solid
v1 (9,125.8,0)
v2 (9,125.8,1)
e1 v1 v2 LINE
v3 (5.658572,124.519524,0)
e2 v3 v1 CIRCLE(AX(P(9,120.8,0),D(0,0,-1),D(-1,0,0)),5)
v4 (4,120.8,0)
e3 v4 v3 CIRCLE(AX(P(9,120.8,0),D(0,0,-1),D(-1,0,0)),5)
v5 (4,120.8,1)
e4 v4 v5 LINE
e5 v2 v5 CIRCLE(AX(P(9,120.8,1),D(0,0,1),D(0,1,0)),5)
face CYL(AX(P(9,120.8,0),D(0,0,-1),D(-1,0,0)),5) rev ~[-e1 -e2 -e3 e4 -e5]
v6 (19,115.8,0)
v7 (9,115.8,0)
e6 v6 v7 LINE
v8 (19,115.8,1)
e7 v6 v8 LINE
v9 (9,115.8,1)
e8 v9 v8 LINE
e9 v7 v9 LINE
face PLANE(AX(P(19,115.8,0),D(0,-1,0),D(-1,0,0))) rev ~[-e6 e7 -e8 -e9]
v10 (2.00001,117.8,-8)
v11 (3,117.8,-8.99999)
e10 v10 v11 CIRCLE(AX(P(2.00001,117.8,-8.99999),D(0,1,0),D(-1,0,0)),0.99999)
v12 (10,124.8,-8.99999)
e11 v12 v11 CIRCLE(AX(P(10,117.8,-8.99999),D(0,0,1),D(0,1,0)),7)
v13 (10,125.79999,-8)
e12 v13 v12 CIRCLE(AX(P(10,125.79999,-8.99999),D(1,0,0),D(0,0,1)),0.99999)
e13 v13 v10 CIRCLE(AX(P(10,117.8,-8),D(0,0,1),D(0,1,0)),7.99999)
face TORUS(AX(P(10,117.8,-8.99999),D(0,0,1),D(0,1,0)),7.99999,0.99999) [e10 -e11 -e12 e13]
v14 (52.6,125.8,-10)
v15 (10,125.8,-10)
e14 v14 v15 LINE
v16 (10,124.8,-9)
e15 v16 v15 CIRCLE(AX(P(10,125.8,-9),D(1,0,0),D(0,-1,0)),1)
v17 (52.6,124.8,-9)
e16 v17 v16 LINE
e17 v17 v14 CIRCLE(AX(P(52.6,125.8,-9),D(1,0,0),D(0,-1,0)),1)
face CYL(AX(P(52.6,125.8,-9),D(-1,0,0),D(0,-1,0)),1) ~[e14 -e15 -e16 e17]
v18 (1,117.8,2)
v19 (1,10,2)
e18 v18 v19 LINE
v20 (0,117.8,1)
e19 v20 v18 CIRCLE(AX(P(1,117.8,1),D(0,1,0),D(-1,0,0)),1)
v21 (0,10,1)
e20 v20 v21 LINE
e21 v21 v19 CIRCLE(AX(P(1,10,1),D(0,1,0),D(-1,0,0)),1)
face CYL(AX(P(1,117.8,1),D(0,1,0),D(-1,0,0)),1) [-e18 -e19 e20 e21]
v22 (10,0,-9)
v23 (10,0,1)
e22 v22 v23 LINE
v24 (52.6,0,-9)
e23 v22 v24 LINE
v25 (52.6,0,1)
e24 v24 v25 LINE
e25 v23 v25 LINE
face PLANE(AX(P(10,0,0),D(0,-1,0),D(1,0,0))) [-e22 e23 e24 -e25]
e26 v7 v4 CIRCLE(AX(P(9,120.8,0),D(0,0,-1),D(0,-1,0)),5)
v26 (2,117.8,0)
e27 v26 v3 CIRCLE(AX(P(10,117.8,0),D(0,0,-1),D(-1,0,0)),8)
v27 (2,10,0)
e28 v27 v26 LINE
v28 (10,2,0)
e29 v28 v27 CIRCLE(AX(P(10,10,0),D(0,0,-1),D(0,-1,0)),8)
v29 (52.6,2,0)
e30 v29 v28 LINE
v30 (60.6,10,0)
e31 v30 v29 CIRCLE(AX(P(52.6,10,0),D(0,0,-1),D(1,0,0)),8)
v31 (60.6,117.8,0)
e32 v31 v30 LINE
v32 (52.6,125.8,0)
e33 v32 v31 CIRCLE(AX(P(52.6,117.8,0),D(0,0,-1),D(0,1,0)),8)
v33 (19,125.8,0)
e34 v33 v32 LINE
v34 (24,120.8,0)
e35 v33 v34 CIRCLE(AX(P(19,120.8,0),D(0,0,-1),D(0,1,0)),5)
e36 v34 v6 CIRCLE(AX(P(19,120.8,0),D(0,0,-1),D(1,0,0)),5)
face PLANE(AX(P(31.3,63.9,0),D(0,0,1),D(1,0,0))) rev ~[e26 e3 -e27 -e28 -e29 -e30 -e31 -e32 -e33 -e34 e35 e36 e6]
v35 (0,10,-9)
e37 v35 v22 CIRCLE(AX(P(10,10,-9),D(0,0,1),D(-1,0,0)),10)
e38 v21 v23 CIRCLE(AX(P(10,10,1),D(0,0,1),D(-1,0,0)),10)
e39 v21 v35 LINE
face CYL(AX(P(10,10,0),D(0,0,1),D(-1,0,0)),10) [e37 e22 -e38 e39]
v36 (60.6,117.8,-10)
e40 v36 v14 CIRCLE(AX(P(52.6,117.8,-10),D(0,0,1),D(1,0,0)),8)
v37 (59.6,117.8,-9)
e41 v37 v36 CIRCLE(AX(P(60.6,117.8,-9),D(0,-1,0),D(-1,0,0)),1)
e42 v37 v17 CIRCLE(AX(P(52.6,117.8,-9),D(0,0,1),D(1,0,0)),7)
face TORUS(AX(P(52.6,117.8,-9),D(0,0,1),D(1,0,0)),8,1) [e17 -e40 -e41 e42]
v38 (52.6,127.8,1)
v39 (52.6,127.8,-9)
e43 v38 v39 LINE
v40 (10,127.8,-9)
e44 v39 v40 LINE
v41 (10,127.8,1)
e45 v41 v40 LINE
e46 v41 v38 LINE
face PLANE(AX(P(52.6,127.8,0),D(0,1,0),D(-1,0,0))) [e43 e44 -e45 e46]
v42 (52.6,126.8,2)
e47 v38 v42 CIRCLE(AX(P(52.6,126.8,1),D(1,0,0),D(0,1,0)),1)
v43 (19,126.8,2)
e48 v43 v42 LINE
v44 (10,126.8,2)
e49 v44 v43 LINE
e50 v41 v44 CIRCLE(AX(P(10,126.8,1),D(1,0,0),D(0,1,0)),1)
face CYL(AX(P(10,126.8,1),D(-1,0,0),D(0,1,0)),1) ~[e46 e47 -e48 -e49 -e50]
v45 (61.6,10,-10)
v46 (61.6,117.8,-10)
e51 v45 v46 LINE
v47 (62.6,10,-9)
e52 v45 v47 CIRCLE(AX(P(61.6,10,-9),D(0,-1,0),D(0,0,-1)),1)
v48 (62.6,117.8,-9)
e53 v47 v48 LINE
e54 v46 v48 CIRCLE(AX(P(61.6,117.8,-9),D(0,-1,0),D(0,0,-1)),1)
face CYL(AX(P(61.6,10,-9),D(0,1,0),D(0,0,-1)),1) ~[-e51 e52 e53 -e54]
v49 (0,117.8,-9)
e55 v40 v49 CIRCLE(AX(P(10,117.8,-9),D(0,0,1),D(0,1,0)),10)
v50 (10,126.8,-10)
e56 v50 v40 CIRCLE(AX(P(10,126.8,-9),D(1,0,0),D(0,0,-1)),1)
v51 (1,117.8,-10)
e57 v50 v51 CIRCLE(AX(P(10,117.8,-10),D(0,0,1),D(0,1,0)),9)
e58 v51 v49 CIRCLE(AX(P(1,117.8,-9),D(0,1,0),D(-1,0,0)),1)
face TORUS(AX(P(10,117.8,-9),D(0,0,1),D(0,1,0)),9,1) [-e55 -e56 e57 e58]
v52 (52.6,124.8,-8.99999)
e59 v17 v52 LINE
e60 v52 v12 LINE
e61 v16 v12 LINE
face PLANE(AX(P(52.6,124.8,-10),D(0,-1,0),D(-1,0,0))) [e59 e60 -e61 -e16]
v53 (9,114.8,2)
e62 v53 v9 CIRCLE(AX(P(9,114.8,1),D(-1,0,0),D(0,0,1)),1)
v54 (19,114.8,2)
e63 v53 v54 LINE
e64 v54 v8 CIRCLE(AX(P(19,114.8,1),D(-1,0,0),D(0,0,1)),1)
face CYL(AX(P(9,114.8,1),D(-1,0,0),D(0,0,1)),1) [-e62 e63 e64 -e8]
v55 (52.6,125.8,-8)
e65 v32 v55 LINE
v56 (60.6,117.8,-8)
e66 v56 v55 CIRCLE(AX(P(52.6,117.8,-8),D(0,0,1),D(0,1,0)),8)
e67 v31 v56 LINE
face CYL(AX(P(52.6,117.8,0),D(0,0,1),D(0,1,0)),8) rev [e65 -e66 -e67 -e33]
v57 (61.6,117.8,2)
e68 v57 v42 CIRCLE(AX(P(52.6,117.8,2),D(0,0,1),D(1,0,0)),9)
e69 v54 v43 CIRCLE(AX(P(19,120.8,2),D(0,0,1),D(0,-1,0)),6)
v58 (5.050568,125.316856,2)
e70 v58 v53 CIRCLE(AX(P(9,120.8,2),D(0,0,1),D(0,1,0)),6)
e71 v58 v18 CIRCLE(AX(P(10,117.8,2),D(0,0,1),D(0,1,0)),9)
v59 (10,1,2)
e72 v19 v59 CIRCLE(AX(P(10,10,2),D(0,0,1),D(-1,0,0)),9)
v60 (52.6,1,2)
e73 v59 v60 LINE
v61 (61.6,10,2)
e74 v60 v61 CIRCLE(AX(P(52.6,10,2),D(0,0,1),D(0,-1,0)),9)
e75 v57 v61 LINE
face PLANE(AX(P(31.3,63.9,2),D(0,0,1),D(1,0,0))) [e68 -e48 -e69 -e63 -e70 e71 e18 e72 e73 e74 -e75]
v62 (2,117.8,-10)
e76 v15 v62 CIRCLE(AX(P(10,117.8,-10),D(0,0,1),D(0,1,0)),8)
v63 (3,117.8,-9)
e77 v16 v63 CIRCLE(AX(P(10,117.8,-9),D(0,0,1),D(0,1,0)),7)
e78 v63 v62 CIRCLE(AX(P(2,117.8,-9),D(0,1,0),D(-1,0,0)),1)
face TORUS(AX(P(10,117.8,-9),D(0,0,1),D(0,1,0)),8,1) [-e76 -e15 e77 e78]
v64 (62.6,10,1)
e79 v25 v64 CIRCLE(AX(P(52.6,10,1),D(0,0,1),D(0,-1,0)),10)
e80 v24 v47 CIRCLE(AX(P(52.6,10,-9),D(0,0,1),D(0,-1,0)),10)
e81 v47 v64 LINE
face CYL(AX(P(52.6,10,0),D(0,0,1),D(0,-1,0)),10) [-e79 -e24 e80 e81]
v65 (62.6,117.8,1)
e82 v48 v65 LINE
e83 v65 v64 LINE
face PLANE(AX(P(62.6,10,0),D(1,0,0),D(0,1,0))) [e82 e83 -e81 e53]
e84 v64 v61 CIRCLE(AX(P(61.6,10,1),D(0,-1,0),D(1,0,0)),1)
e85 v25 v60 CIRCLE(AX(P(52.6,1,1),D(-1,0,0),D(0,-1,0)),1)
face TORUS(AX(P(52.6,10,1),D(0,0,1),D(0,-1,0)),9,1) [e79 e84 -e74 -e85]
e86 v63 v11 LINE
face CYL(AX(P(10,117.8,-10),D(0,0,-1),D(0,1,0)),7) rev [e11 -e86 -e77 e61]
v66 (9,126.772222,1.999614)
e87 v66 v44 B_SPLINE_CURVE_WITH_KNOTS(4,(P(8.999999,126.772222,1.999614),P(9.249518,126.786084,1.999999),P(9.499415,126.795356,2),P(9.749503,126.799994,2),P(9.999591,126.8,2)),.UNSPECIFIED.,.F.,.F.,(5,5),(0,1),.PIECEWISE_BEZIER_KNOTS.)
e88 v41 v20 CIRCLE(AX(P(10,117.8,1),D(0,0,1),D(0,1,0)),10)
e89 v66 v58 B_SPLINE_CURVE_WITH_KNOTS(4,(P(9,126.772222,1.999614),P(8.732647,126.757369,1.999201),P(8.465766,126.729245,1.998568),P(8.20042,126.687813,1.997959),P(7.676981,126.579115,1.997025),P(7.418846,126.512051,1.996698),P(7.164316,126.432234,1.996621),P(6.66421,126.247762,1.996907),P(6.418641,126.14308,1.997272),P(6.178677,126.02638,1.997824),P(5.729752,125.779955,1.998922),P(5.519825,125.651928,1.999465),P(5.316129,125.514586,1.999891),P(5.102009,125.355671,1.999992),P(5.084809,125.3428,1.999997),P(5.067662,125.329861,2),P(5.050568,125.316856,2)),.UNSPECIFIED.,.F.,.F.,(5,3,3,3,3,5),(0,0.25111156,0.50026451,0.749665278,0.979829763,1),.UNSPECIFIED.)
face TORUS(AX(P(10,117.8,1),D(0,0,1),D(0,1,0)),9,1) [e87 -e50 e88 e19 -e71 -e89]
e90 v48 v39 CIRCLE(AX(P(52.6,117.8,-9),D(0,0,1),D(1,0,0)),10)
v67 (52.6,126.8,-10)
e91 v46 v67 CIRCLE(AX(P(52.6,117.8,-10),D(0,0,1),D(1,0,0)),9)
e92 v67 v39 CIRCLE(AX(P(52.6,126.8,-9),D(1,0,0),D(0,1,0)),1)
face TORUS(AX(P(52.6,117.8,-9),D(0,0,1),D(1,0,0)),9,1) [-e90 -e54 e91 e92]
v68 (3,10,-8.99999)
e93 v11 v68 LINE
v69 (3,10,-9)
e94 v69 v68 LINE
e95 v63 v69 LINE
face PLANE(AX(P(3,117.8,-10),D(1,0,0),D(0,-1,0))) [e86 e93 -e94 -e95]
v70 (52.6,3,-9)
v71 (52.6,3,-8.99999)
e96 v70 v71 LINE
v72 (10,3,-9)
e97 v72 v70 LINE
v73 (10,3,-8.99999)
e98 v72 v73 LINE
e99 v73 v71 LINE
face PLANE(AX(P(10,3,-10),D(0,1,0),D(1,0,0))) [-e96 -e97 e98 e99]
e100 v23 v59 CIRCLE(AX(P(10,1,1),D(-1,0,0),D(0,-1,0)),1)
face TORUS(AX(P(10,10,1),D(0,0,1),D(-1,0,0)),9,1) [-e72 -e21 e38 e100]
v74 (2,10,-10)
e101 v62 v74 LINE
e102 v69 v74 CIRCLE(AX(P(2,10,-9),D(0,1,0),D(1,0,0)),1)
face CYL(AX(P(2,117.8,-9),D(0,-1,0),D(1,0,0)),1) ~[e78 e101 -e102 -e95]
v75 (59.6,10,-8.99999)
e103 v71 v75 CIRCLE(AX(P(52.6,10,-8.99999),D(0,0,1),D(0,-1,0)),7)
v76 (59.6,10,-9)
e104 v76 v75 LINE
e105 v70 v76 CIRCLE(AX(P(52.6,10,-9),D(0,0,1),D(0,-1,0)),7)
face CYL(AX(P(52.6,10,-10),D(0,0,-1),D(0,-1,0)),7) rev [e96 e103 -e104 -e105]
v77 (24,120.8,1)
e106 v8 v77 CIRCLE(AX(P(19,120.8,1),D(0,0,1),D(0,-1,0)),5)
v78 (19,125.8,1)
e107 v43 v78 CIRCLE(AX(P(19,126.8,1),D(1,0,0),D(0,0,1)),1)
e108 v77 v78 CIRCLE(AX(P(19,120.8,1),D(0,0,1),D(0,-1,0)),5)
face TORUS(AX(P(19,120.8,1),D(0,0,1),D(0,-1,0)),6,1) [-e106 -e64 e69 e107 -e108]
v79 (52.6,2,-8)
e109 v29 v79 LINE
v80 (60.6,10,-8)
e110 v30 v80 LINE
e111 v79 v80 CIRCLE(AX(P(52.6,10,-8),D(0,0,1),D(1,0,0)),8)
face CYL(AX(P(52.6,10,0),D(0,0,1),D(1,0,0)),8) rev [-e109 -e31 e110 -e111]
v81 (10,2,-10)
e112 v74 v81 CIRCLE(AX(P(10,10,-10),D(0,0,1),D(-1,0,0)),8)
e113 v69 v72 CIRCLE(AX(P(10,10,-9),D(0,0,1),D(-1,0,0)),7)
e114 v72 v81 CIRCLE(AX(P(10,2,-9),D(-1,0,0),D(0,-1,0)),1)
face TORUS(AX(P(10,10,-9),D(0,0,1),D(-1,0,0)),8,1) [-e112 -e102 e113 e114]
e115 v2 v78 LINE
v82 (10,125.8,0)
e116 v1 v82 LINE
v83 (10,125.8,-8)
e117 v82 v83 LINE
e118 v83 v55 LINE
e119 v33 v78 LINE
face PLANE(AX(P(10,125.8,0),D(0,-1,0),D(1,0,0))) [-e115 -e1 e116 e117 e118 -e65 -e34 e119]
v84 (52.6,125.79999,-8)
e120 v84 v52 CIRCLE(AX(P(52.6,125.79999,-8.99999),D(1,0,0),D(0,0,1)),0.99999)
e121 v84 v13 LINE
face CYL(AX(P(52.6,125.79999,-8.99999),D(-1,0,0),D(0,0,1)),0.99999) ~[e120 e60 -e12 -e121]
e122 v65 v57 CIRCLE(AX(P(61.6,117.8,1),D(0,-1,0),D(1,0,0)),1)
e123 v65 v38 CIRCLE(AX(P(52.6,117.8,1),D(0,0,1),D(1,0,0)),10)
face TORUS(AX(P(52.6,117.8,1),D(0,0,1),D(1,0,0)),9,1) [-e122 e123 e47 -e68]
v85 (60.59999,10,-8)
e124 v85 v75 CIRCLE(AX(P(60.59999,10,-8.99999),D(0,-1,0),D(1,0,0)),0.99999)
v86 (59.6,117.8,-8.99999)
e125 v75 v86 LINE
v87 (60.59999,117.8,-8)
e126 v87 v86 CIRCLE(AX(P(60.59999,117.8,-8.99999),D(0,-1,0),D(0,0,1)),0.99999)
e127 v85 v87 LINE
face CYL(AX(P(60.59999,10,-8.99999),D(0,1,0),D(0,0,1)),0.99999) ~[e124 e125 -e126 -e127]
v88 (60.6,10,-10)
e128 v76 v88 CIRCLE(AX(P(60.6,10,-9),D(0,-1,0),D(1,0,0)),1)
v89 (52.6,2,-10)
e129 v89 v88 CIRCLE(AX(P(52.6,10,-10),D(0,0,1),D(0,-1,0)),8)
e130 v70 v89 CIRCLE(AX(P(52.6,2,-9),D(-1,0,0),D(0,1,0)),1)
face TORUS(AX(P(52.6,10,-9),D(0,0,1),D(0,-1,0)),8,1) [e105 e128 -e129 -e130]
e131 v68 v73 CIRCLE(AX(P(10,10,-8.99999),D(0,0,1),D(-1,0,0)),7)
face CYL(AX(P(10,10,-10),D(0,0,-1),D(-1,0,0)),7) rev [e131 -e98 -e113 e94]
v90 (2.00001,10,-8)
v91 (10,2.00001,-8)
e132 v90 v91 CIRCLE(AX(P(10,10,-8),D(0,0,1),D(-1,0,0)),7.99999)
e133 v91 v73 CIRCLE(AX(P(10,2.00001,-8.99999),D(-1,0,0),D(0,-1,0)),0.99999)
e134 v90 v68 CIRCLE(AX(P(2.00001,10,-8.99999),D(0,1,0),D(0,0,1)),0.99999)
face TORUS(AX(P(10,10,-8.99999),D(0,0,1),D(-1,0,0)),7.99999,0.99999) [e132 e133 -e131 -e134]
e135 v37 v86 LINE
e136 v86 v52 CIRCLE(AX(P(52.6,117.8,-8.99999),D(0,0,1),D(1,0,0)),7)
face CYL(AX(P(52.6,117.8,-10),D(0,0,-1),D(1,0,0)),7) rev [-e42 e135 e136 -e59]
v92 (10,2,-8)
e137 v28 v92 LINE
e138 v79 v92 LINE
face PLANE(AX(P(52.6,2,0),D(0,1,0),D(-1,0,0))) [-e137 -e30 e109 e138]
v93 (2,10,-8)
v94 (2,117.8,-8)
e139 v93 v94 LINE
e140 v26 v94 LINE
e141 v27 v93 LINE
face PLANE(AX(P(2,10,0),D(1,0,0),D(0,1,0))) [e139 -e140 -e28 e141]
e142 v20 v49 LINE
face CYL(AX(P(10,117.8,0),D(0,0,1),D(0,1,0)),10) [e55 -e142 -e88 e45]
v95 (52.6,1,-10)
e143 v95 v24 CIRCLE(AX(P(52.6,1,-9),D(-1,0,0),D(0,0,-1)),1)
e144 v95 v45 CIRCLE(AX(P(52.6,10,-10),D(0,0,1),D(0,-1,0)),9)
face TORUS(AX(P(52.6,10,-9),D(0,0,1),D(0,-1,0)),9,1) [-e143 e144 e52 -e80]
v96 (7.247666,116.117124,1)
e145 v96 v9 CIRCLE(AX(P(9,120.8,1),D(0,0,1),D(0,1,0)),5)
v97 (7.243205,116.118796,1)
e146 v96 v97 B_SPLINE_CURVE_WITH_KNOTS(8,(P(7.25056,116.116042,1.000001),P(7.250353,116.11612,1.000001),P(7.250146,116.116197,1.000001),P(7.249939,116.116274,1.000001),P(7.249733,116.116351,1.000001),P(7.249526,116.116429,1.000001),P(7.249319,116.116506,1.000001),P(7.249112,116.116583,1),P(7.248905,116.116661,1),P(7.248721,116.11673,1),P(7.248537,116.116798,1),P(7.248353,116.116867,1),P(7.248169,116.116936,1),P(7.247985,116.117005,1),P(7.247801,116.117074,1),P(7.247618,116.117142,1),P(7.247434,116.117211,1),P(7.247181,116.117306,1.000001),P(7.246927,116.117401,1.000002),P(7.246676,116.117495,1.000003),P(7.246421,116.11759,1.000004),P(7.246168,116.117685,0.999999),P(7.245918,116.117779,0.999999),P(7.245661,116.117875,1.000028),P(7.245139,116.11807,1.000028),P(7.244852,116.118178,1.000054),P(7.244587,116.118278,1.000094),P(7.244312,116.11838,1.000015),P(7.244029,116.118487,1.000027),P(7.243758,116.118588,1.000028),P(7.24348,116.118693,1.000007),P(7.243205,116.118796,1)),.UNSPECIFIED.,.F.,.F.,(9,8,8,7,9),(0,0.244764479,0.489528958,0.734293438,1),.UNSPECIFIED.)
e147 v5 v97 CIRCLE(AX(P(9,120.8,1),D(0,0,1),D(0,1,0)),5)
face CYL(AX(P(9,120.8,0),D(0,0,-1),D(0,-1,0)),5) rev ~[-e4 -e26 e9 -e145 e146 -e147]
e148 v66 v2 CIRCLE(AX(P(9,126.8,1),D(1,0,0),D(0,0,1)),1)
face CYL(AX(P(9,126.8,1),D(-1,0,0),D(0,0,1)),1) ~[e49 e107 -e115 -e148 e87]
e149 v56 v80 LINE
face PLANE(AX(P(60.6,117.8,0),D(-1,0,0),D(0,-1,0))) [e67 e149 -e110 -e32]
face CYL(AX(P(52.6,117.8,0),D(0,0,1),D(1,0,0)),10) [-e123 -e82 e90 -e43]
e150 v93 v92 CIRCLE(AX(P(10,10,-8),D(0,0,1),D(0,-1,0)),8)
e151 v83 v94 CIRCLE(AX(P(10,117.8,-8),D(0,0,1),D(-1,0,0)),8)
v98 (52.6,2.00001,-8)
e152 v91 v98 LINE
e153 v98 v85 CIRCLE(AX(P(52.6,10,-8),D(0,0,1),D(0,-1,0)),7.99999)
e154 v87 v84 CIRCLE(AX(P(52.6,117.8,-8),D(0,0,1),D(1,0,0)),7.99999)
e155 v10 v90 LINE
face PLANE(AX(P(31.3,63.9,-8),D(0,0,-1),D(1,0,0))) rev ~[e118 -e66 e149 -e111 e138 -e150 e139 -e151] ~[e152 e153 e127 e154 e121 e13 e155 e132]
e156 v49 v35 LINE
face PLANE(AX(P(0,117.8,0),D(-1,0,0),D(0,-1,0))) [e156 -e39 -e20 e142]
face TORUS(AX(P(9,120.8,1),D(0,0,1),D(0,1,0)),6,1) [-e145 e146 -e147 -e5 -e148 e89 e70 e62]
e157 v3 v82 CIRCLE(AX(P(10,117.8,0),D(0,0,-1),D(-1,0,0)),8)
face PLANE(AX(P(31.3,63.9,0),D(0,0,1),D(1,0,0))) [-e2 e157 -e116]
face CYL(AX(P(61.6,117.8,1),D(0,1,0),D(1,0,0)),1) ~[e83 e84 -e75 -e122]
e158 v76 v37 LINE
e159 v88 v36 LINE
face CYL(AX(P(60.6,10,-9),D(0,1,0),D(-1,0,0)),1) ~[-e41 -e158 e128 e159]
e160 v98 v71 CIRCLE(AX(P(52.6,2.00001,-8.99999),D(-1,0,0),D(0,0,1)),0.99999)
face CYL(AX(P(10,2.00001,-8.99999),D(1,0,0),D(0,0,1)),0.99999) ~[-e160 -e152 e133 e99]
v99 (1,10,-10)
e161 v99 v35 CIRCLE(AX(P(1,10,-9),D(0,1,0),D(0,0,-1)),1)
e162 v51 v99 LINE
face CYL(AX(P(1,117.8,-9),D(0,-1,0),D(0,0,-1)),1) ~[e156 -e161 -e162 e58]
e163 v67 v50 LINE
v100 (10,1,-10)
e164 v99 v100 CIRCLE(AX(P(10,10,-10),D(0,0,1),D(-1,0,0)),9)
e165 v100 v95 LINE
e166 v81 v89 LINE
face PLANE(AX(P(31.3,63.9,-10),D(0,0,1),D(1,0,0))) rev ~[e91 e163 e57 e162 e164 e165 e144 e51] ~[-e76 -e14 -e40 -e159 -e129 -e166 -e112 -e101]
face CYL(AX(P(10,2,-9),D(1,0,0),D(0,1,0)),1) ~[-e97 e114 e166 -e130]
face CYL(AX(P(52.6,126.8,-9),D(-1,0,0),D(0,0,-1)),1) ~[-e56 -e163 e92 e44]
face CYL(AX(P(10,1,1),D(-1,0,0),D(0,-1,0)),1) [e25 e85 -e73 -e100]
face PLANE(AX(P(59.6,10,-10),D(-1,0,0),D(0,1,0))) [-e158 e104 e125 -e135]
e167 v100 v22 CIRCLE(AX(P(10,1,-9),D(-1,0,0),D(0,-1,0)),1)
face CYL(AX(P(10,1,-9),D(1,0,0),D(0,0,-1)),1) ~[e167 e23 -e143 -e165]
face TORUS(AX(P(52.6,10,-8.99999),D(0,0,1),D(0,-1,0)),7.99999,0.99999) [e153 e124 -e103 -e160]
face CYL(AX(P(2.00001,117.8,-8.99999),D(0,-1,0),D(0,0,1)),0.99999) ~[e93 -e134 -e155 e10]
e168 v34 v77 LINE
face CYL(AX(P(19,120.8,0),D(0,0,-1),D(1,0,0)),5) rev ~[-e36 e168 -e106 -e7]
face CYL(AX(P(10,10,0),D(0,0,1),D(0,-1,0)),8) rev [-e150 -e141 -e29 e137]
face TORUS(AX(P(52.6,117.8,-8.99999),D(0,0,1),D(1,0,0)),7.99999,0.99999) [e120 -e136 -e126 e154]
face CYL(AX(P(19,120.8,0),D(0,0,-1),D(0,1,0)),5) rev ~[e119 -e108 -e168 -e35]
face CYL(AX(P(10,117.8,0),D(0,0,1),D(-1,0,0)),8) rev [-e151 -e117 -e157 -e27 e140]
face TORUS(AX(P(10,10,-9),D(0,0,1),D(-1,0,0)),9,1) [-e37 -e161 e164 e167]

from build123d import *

# Parameters (mm, degrees)
F1_DEPTH     = 2
F3_DEPTH     = 10
F5_DEPTH     = 2
F6_R         = 1
F7_R         = 0.99999
F8_R         = 1
F9_T1_DEPTH  = 42.6
F9_T3_DEPTH  = 107.8
F9_T5_DEPTH  = 10
F9_T8_ANGLE  = 90
F9_T10_ANGLE = 90
F9_T12_ANGLE = 90
F9_T14_ANGLE = 90
F9_T16_ANGLE = 180
F9_T18_ANGLE = 180


# Not quite as in the source:
# - a fillet or chamfer that OpenCascade refuses, or shapes differently, is made with other operations: its cross-section is extruded or revolved along the edge and cut away or added
# - a fillet or chamfer is up to 0.001 mm smaller than in the source, because OpenCascade refuses the exact size


with BuildPart() as f1:
    # F0 (on Top) → F1 (new body)
    with BuildSketch(Plane.XY):
        with BuildLine():
            ThreePointArc((0, 10), (2.9289321881, 2.9289321881), (10, 0))
            Line((10, 0), (52.6, 0))
            ThreePointArc((52.6, 0), (59.6710678119, 2.9289321881), (62.6, 10))
            Line((62.6, 10), (62.6, 117.8))
            ThreePointArc((62.6, 117.8), (59.6710678119, 124.8710678119), (52.6, 127.8))
            Line((52.6, 127.8), (10, 127.8))
            ThreePointArc((10, 127.8), (2.9289321881, 124.8710678119), (0, 117.8))
            Line((0, 117.8), (0, 10))
        make_face()
        with BuildLine():
            ThreePointArc((4, 120.8), (5.4644660941, 124.3355339059), (9, 125.8))
            Line((9, 125.8), (19, 125.8))
            ThreePointArc((19, 125.8), (22.5355339059, 124.3355339059), (24, 120.8))
            ThreePointArc((24, 120.8), (22.5355339059, 117.2644660941), (19, 115.8))
            Line((19, 115.8), (9, 115.8))
            ThreePointArc((9, 115.8), (5.4644660941, 117.2644660941), (4, 120.8))
        make_face(mode=Mode.SUBTRACT)
    extrude(amount=F1_DEPTH)

    # F2 (on Top) → F3 (join)
    with BuildSketch(Plane.XY):
        with BuildLine():
            ThreePointArc((0, 10), (2.9289321881, 2.9289321881), (10, 0))
            Line((10, 0), (52.6, 0))
            ThreePointArc((52.6, 0), (59.6710678119, 2.9289321881), (62.6, 10))
            Line((62.6, 10), (62.6, 117.8))
            ThreePointArc((62.6, 117.8), (59.6710678119, 124.8710678119), (52.6, 127.8))
            Line((52.6, 127.8), (10, 127.8))
            ThreePointArc((10, 127.8), (2.9289321881, 124.8710678119), (0, 117.8))
            Line((0, 117.8), (0, 10))
        make_face()
        with BuildLine():
            ThreePointArc((10, 2), (4.3431457505, 4.3431457505), (2, 10))
            Line((2, 10), (2, 117.8))
            ThreePointArc((2, 117.8), (4.3431457505, 123.4568542495), (10, 125.8))
            Line((10, 125.8), (52.6, 125.8))
            ThreePointArc((52.6, 125.8), (58.2568542495, 123.4568542495), (60.6, 117.8))
            Line((60.6, 117.8), (60.6, 10))
            ThreePointArc((60.6, 10), (58.2568542495, 4.3431457505), (52.6, 2))
            Line((52.6, 2), (10, 2))
        make_face(mode=Mode.SUBTRACT)
    extrude(amount=-F3_DEPTH)

    # F4 (on face) → F5 (join)
    with BuildSketch(Plane(origin=(0, 0, -10), x_dir=(1, 0, 0), z_dir=(0, 0, -1))):
        with BuildLine():
            ThreePointArc((0, -117.8), (2.9289321881, -124.8710678119), (10, -127.8))
            Line((10, -127.8), (52.6, -127.8))
            ThreePointArc((52.6, -127.8), (59.6710678119, -124.8710678119), (62.6, -117.8))
            Line((62.6, -117.8), (62.6, -10))
            ThreePointArc((62.6, -10), (59.6710678119, -2.9289321881), (52.6, 0))
            Line((52.6, 0), (10, 0))
            ThreePointArc((10, 0), (2.9289321881, -2.9289321881), (0, -10))
            Line((0, -10), (0, -117.8))
        make_face()
        with BuildLine():
            ThreePointArc((10, -124.8), (5.0502525317, -122.7497474683), (3, -117.8))
            Line((3, -117.8), (3, -10))
            ThreePointArc((3, -10), (5.0502525317, -5.0502525317), (10, -3))
            Line((10, -3), (52.6, -3))
            ThreePointArc((52.6, -3), (57.5497474683, -5.0502525317), (59.6, -10))
            Line((59.6, -10), (59.6, -117.8))
            ThreePointArc((59.6, -117.8), (57.5497474683, -122.7497474683), (52.6, -124.8))
            Line((52.6, -124.8), (10, -124.8))
        make_face(mode=Mode.SUBTRACT)
    extrude(amount=-F5_DEPTH)

    # F6
    f6_edges = [f1.edges().sort_by_distance(p)[0] for p in [
        (31.3, 124.8, -10),
    ]]
    fillet(f6_edges, radius=F6_R)

    # F7 (radius 1 in the source; OpenCascade refuses exactly that, so slightly less here)
    f7_edges = [f1.edges().sort_by_distance(p)[0] for p in [
        (31.3, 124.8, -8),
        (57.549747, 122.749747, -8),
        (59.6, 63.9, -8),
        (57.549747, 5.050253, -8),
        (31.3, 3, -8),
        (5.050253, 5.050253, -8),
        (3, 63.9, -8),
        (5.050253, 122.749747, -8),
    ]]
    fillet(f7_edges, radius=F7_R)

    # F8
    f8_edges = [f1.edges().sort_by_distance(p)[0] for p in [
        (62.6, 63.9, -10),
        (59.671068, 124.871068, -10),
        (31.3, 127.8, -10),
        (2.928932, 124.871068, -10),
        (0, 63.9, -10),
        (2.928932, 2.928932, -10),
        (31.3, 0, -10),
        (59.671068, 2.928932, -10),
    ]]
    fillet(f8_edges, radius=F8_R)

    # F9: fillet of radius 1 on 12 edges, made by hand

    # F9_s2 → F9_t1 (cut)
    with BuildSketch(Plane.YZ.offset(10)):
        with BuildLine():
            ThreePointArc((0, 1), (0.2928932188, 1.7071067812), (1, 2))
            Line((1, 2), (0, 2))
            Line((0, 2), (0, 1))
        make_face()
        with BuildLine():
            ThreePointArc((127.8, 1), (127.5071067812, 1.7071067812), (126.8, 2))
            Line((126.8, 2), (127.8, 2))
            Line((127.8, 2), (127.8, 1))
        make_face()
    extrude(amount=F9_T1_DEPTH, mode=Mode.SUBTRACT)

    # F9_s4 → F9_t3 (cut)
    with BuildSketch(Plane.XZ.offset(-117.8)):
        with BuildLine():
            ThreePointArc((0, 1), (0.2928932188, 1.7071067812), (1, 2))
            Line((1, 2), (0, 2))
            Line((0, 2), (0, 1))
        make_face()
        with BuildLine():
            ThreePointArc((62.6, 1), (62.3071067812, 1.7071067812), (61.6, 2))
            Line((61.6, 2), (62.6, 2))
            Line((62.6, 2), (62.6, 1))
        make_face()
    extrude(amount=F9_T3_DEPTH, mode=Mode.SUBTRACT)

    # F9_s6 → F9_t5 (cut)
    with BuildSketch(Plane.YZ.offset(9)):
        with BuildLine():
            ThreePointArc((126.8, 2), (126.0928932188, 1.7071067812), (125.8, 1))
            Line((125.8, 1), (125.8, 2))
            Line((125.8, 2), (126.8, 2))
        make_face()
        with BuildLine():
            ThreePointArc((114.8, 2), (115.5071067812, 1.7071067812), (115.8, 1))
            Line((115.8, 1), (115.8, 2))
            Line((115.8, 2), (114.8, 2))
        make_face()
    extrude(amount=F9_T5_DEPTH, mode=Mode.SUBTRACT)

    # F9_s7 → F9_t8 (revolve, cut)
    with BuildSketch(Plane.XZ.offset(-10)):
        with BuildLine():
            ThreePointArc((0, 1), (0.2928932188, 1.7071067812), (1, 2))
            Line((1, 2), (0, 2))
            Line((0, 2), (0, 1))
        make_face()
    revolve(axis=Axis((10, 10, 2), (0, 0, 1)), revolution_arc=F9_T8_ANGLE, mode=Mode.SUBTRACT)

    # F9_s9 → F9_t10 (revolve, cut)
    with BuildSketch(Plane.YZ.offset(52.6)):
        with BuildLine():
            ThreePointArc((0, 1), (0.2928932188, 1.7071067812), (1, 2))
            Line((1, 2), (0, 2))
            Line((0, 2), (0, 1))
        make_face()
    revolve(axis=Axis((52.6, 10, 2), (0, 0, 1)), revolution_arc=F9_T10_ANGLE, mode=Mode.SUBTRACT)

    # F9_s11 → F9_t12 (revolve, cut)
    with BuildSketch(Plane.XZ.offset(-117.8)):
        with BuildLine():
            ThreePointArc((62.6, 1), (62.3071067812, 1.7071067812), (61.6, 2))
            Line((61.6, 2), (62.6, 2))
            Line((62.6, 2), (62.6, 1))
        make_face()
    revolve(axis=Axis((52.6, 117.8, 2), (0, 0, 1)), revolution_arc=F9_T12_ANGLE, mode=Mode.SUBTRACT)

    # F9_s13 → F9_t14 (revolve, cut)
    with BuildSketch(Plane.YZ.offset(10)):
        with BuildLine():
            ThreePointArc((127.8, 1), (127.5071067812, 1.7071067812), (126.8, 2))
            Line((126.8, 2), (127.8, 2))
            Line((127.8, 2), (127.8, 1))
        make_face()
    revolve(axis=Axis((10, 117.8, 2), (0, 0, 1)), revolution_arc=F9_T14_ANGLE, mode=Mode.SUBTRACT)

    # F9_s15 → F9_t16 (revolve, cut)
    with BuildSketch(Plane.YZ.offset(9)):
        with BuildLine():
            ThreePointArc((126.8, 2), (126.0928932188, 1.7071067812), (125.8, 1))
            Line((125.8, 1), (125.8, 2))
            Line((125.8, 2), (126.8, 2))
        make_face()
    revolve(axis=Axis((9, 120.8, 2), (0, 0, 1)), revolution_arc=F9_T16_ANGLE, mode=Mode.SUBTRACT)

    # F9_s17 → F9_t18 (revolve, cut)
    with BuildSketch(Plane.YZ.offset(19)):
        with BuildLine():
            ThreePointArc((114.8, 2), (115.5071067812, 1.7071067812), (115.8, 1))
            Line((115.8, 1), (115.8, 2))
            Line((115.8, 2), (114.8, 2))
        make_face()
    revolve(axis=Axis((19, 120.8, 2), (0, 0, 1)), revolution_arc=F9_T18_ANGLE, mode=Mode.SUBTRACT)


solid = f1.part
